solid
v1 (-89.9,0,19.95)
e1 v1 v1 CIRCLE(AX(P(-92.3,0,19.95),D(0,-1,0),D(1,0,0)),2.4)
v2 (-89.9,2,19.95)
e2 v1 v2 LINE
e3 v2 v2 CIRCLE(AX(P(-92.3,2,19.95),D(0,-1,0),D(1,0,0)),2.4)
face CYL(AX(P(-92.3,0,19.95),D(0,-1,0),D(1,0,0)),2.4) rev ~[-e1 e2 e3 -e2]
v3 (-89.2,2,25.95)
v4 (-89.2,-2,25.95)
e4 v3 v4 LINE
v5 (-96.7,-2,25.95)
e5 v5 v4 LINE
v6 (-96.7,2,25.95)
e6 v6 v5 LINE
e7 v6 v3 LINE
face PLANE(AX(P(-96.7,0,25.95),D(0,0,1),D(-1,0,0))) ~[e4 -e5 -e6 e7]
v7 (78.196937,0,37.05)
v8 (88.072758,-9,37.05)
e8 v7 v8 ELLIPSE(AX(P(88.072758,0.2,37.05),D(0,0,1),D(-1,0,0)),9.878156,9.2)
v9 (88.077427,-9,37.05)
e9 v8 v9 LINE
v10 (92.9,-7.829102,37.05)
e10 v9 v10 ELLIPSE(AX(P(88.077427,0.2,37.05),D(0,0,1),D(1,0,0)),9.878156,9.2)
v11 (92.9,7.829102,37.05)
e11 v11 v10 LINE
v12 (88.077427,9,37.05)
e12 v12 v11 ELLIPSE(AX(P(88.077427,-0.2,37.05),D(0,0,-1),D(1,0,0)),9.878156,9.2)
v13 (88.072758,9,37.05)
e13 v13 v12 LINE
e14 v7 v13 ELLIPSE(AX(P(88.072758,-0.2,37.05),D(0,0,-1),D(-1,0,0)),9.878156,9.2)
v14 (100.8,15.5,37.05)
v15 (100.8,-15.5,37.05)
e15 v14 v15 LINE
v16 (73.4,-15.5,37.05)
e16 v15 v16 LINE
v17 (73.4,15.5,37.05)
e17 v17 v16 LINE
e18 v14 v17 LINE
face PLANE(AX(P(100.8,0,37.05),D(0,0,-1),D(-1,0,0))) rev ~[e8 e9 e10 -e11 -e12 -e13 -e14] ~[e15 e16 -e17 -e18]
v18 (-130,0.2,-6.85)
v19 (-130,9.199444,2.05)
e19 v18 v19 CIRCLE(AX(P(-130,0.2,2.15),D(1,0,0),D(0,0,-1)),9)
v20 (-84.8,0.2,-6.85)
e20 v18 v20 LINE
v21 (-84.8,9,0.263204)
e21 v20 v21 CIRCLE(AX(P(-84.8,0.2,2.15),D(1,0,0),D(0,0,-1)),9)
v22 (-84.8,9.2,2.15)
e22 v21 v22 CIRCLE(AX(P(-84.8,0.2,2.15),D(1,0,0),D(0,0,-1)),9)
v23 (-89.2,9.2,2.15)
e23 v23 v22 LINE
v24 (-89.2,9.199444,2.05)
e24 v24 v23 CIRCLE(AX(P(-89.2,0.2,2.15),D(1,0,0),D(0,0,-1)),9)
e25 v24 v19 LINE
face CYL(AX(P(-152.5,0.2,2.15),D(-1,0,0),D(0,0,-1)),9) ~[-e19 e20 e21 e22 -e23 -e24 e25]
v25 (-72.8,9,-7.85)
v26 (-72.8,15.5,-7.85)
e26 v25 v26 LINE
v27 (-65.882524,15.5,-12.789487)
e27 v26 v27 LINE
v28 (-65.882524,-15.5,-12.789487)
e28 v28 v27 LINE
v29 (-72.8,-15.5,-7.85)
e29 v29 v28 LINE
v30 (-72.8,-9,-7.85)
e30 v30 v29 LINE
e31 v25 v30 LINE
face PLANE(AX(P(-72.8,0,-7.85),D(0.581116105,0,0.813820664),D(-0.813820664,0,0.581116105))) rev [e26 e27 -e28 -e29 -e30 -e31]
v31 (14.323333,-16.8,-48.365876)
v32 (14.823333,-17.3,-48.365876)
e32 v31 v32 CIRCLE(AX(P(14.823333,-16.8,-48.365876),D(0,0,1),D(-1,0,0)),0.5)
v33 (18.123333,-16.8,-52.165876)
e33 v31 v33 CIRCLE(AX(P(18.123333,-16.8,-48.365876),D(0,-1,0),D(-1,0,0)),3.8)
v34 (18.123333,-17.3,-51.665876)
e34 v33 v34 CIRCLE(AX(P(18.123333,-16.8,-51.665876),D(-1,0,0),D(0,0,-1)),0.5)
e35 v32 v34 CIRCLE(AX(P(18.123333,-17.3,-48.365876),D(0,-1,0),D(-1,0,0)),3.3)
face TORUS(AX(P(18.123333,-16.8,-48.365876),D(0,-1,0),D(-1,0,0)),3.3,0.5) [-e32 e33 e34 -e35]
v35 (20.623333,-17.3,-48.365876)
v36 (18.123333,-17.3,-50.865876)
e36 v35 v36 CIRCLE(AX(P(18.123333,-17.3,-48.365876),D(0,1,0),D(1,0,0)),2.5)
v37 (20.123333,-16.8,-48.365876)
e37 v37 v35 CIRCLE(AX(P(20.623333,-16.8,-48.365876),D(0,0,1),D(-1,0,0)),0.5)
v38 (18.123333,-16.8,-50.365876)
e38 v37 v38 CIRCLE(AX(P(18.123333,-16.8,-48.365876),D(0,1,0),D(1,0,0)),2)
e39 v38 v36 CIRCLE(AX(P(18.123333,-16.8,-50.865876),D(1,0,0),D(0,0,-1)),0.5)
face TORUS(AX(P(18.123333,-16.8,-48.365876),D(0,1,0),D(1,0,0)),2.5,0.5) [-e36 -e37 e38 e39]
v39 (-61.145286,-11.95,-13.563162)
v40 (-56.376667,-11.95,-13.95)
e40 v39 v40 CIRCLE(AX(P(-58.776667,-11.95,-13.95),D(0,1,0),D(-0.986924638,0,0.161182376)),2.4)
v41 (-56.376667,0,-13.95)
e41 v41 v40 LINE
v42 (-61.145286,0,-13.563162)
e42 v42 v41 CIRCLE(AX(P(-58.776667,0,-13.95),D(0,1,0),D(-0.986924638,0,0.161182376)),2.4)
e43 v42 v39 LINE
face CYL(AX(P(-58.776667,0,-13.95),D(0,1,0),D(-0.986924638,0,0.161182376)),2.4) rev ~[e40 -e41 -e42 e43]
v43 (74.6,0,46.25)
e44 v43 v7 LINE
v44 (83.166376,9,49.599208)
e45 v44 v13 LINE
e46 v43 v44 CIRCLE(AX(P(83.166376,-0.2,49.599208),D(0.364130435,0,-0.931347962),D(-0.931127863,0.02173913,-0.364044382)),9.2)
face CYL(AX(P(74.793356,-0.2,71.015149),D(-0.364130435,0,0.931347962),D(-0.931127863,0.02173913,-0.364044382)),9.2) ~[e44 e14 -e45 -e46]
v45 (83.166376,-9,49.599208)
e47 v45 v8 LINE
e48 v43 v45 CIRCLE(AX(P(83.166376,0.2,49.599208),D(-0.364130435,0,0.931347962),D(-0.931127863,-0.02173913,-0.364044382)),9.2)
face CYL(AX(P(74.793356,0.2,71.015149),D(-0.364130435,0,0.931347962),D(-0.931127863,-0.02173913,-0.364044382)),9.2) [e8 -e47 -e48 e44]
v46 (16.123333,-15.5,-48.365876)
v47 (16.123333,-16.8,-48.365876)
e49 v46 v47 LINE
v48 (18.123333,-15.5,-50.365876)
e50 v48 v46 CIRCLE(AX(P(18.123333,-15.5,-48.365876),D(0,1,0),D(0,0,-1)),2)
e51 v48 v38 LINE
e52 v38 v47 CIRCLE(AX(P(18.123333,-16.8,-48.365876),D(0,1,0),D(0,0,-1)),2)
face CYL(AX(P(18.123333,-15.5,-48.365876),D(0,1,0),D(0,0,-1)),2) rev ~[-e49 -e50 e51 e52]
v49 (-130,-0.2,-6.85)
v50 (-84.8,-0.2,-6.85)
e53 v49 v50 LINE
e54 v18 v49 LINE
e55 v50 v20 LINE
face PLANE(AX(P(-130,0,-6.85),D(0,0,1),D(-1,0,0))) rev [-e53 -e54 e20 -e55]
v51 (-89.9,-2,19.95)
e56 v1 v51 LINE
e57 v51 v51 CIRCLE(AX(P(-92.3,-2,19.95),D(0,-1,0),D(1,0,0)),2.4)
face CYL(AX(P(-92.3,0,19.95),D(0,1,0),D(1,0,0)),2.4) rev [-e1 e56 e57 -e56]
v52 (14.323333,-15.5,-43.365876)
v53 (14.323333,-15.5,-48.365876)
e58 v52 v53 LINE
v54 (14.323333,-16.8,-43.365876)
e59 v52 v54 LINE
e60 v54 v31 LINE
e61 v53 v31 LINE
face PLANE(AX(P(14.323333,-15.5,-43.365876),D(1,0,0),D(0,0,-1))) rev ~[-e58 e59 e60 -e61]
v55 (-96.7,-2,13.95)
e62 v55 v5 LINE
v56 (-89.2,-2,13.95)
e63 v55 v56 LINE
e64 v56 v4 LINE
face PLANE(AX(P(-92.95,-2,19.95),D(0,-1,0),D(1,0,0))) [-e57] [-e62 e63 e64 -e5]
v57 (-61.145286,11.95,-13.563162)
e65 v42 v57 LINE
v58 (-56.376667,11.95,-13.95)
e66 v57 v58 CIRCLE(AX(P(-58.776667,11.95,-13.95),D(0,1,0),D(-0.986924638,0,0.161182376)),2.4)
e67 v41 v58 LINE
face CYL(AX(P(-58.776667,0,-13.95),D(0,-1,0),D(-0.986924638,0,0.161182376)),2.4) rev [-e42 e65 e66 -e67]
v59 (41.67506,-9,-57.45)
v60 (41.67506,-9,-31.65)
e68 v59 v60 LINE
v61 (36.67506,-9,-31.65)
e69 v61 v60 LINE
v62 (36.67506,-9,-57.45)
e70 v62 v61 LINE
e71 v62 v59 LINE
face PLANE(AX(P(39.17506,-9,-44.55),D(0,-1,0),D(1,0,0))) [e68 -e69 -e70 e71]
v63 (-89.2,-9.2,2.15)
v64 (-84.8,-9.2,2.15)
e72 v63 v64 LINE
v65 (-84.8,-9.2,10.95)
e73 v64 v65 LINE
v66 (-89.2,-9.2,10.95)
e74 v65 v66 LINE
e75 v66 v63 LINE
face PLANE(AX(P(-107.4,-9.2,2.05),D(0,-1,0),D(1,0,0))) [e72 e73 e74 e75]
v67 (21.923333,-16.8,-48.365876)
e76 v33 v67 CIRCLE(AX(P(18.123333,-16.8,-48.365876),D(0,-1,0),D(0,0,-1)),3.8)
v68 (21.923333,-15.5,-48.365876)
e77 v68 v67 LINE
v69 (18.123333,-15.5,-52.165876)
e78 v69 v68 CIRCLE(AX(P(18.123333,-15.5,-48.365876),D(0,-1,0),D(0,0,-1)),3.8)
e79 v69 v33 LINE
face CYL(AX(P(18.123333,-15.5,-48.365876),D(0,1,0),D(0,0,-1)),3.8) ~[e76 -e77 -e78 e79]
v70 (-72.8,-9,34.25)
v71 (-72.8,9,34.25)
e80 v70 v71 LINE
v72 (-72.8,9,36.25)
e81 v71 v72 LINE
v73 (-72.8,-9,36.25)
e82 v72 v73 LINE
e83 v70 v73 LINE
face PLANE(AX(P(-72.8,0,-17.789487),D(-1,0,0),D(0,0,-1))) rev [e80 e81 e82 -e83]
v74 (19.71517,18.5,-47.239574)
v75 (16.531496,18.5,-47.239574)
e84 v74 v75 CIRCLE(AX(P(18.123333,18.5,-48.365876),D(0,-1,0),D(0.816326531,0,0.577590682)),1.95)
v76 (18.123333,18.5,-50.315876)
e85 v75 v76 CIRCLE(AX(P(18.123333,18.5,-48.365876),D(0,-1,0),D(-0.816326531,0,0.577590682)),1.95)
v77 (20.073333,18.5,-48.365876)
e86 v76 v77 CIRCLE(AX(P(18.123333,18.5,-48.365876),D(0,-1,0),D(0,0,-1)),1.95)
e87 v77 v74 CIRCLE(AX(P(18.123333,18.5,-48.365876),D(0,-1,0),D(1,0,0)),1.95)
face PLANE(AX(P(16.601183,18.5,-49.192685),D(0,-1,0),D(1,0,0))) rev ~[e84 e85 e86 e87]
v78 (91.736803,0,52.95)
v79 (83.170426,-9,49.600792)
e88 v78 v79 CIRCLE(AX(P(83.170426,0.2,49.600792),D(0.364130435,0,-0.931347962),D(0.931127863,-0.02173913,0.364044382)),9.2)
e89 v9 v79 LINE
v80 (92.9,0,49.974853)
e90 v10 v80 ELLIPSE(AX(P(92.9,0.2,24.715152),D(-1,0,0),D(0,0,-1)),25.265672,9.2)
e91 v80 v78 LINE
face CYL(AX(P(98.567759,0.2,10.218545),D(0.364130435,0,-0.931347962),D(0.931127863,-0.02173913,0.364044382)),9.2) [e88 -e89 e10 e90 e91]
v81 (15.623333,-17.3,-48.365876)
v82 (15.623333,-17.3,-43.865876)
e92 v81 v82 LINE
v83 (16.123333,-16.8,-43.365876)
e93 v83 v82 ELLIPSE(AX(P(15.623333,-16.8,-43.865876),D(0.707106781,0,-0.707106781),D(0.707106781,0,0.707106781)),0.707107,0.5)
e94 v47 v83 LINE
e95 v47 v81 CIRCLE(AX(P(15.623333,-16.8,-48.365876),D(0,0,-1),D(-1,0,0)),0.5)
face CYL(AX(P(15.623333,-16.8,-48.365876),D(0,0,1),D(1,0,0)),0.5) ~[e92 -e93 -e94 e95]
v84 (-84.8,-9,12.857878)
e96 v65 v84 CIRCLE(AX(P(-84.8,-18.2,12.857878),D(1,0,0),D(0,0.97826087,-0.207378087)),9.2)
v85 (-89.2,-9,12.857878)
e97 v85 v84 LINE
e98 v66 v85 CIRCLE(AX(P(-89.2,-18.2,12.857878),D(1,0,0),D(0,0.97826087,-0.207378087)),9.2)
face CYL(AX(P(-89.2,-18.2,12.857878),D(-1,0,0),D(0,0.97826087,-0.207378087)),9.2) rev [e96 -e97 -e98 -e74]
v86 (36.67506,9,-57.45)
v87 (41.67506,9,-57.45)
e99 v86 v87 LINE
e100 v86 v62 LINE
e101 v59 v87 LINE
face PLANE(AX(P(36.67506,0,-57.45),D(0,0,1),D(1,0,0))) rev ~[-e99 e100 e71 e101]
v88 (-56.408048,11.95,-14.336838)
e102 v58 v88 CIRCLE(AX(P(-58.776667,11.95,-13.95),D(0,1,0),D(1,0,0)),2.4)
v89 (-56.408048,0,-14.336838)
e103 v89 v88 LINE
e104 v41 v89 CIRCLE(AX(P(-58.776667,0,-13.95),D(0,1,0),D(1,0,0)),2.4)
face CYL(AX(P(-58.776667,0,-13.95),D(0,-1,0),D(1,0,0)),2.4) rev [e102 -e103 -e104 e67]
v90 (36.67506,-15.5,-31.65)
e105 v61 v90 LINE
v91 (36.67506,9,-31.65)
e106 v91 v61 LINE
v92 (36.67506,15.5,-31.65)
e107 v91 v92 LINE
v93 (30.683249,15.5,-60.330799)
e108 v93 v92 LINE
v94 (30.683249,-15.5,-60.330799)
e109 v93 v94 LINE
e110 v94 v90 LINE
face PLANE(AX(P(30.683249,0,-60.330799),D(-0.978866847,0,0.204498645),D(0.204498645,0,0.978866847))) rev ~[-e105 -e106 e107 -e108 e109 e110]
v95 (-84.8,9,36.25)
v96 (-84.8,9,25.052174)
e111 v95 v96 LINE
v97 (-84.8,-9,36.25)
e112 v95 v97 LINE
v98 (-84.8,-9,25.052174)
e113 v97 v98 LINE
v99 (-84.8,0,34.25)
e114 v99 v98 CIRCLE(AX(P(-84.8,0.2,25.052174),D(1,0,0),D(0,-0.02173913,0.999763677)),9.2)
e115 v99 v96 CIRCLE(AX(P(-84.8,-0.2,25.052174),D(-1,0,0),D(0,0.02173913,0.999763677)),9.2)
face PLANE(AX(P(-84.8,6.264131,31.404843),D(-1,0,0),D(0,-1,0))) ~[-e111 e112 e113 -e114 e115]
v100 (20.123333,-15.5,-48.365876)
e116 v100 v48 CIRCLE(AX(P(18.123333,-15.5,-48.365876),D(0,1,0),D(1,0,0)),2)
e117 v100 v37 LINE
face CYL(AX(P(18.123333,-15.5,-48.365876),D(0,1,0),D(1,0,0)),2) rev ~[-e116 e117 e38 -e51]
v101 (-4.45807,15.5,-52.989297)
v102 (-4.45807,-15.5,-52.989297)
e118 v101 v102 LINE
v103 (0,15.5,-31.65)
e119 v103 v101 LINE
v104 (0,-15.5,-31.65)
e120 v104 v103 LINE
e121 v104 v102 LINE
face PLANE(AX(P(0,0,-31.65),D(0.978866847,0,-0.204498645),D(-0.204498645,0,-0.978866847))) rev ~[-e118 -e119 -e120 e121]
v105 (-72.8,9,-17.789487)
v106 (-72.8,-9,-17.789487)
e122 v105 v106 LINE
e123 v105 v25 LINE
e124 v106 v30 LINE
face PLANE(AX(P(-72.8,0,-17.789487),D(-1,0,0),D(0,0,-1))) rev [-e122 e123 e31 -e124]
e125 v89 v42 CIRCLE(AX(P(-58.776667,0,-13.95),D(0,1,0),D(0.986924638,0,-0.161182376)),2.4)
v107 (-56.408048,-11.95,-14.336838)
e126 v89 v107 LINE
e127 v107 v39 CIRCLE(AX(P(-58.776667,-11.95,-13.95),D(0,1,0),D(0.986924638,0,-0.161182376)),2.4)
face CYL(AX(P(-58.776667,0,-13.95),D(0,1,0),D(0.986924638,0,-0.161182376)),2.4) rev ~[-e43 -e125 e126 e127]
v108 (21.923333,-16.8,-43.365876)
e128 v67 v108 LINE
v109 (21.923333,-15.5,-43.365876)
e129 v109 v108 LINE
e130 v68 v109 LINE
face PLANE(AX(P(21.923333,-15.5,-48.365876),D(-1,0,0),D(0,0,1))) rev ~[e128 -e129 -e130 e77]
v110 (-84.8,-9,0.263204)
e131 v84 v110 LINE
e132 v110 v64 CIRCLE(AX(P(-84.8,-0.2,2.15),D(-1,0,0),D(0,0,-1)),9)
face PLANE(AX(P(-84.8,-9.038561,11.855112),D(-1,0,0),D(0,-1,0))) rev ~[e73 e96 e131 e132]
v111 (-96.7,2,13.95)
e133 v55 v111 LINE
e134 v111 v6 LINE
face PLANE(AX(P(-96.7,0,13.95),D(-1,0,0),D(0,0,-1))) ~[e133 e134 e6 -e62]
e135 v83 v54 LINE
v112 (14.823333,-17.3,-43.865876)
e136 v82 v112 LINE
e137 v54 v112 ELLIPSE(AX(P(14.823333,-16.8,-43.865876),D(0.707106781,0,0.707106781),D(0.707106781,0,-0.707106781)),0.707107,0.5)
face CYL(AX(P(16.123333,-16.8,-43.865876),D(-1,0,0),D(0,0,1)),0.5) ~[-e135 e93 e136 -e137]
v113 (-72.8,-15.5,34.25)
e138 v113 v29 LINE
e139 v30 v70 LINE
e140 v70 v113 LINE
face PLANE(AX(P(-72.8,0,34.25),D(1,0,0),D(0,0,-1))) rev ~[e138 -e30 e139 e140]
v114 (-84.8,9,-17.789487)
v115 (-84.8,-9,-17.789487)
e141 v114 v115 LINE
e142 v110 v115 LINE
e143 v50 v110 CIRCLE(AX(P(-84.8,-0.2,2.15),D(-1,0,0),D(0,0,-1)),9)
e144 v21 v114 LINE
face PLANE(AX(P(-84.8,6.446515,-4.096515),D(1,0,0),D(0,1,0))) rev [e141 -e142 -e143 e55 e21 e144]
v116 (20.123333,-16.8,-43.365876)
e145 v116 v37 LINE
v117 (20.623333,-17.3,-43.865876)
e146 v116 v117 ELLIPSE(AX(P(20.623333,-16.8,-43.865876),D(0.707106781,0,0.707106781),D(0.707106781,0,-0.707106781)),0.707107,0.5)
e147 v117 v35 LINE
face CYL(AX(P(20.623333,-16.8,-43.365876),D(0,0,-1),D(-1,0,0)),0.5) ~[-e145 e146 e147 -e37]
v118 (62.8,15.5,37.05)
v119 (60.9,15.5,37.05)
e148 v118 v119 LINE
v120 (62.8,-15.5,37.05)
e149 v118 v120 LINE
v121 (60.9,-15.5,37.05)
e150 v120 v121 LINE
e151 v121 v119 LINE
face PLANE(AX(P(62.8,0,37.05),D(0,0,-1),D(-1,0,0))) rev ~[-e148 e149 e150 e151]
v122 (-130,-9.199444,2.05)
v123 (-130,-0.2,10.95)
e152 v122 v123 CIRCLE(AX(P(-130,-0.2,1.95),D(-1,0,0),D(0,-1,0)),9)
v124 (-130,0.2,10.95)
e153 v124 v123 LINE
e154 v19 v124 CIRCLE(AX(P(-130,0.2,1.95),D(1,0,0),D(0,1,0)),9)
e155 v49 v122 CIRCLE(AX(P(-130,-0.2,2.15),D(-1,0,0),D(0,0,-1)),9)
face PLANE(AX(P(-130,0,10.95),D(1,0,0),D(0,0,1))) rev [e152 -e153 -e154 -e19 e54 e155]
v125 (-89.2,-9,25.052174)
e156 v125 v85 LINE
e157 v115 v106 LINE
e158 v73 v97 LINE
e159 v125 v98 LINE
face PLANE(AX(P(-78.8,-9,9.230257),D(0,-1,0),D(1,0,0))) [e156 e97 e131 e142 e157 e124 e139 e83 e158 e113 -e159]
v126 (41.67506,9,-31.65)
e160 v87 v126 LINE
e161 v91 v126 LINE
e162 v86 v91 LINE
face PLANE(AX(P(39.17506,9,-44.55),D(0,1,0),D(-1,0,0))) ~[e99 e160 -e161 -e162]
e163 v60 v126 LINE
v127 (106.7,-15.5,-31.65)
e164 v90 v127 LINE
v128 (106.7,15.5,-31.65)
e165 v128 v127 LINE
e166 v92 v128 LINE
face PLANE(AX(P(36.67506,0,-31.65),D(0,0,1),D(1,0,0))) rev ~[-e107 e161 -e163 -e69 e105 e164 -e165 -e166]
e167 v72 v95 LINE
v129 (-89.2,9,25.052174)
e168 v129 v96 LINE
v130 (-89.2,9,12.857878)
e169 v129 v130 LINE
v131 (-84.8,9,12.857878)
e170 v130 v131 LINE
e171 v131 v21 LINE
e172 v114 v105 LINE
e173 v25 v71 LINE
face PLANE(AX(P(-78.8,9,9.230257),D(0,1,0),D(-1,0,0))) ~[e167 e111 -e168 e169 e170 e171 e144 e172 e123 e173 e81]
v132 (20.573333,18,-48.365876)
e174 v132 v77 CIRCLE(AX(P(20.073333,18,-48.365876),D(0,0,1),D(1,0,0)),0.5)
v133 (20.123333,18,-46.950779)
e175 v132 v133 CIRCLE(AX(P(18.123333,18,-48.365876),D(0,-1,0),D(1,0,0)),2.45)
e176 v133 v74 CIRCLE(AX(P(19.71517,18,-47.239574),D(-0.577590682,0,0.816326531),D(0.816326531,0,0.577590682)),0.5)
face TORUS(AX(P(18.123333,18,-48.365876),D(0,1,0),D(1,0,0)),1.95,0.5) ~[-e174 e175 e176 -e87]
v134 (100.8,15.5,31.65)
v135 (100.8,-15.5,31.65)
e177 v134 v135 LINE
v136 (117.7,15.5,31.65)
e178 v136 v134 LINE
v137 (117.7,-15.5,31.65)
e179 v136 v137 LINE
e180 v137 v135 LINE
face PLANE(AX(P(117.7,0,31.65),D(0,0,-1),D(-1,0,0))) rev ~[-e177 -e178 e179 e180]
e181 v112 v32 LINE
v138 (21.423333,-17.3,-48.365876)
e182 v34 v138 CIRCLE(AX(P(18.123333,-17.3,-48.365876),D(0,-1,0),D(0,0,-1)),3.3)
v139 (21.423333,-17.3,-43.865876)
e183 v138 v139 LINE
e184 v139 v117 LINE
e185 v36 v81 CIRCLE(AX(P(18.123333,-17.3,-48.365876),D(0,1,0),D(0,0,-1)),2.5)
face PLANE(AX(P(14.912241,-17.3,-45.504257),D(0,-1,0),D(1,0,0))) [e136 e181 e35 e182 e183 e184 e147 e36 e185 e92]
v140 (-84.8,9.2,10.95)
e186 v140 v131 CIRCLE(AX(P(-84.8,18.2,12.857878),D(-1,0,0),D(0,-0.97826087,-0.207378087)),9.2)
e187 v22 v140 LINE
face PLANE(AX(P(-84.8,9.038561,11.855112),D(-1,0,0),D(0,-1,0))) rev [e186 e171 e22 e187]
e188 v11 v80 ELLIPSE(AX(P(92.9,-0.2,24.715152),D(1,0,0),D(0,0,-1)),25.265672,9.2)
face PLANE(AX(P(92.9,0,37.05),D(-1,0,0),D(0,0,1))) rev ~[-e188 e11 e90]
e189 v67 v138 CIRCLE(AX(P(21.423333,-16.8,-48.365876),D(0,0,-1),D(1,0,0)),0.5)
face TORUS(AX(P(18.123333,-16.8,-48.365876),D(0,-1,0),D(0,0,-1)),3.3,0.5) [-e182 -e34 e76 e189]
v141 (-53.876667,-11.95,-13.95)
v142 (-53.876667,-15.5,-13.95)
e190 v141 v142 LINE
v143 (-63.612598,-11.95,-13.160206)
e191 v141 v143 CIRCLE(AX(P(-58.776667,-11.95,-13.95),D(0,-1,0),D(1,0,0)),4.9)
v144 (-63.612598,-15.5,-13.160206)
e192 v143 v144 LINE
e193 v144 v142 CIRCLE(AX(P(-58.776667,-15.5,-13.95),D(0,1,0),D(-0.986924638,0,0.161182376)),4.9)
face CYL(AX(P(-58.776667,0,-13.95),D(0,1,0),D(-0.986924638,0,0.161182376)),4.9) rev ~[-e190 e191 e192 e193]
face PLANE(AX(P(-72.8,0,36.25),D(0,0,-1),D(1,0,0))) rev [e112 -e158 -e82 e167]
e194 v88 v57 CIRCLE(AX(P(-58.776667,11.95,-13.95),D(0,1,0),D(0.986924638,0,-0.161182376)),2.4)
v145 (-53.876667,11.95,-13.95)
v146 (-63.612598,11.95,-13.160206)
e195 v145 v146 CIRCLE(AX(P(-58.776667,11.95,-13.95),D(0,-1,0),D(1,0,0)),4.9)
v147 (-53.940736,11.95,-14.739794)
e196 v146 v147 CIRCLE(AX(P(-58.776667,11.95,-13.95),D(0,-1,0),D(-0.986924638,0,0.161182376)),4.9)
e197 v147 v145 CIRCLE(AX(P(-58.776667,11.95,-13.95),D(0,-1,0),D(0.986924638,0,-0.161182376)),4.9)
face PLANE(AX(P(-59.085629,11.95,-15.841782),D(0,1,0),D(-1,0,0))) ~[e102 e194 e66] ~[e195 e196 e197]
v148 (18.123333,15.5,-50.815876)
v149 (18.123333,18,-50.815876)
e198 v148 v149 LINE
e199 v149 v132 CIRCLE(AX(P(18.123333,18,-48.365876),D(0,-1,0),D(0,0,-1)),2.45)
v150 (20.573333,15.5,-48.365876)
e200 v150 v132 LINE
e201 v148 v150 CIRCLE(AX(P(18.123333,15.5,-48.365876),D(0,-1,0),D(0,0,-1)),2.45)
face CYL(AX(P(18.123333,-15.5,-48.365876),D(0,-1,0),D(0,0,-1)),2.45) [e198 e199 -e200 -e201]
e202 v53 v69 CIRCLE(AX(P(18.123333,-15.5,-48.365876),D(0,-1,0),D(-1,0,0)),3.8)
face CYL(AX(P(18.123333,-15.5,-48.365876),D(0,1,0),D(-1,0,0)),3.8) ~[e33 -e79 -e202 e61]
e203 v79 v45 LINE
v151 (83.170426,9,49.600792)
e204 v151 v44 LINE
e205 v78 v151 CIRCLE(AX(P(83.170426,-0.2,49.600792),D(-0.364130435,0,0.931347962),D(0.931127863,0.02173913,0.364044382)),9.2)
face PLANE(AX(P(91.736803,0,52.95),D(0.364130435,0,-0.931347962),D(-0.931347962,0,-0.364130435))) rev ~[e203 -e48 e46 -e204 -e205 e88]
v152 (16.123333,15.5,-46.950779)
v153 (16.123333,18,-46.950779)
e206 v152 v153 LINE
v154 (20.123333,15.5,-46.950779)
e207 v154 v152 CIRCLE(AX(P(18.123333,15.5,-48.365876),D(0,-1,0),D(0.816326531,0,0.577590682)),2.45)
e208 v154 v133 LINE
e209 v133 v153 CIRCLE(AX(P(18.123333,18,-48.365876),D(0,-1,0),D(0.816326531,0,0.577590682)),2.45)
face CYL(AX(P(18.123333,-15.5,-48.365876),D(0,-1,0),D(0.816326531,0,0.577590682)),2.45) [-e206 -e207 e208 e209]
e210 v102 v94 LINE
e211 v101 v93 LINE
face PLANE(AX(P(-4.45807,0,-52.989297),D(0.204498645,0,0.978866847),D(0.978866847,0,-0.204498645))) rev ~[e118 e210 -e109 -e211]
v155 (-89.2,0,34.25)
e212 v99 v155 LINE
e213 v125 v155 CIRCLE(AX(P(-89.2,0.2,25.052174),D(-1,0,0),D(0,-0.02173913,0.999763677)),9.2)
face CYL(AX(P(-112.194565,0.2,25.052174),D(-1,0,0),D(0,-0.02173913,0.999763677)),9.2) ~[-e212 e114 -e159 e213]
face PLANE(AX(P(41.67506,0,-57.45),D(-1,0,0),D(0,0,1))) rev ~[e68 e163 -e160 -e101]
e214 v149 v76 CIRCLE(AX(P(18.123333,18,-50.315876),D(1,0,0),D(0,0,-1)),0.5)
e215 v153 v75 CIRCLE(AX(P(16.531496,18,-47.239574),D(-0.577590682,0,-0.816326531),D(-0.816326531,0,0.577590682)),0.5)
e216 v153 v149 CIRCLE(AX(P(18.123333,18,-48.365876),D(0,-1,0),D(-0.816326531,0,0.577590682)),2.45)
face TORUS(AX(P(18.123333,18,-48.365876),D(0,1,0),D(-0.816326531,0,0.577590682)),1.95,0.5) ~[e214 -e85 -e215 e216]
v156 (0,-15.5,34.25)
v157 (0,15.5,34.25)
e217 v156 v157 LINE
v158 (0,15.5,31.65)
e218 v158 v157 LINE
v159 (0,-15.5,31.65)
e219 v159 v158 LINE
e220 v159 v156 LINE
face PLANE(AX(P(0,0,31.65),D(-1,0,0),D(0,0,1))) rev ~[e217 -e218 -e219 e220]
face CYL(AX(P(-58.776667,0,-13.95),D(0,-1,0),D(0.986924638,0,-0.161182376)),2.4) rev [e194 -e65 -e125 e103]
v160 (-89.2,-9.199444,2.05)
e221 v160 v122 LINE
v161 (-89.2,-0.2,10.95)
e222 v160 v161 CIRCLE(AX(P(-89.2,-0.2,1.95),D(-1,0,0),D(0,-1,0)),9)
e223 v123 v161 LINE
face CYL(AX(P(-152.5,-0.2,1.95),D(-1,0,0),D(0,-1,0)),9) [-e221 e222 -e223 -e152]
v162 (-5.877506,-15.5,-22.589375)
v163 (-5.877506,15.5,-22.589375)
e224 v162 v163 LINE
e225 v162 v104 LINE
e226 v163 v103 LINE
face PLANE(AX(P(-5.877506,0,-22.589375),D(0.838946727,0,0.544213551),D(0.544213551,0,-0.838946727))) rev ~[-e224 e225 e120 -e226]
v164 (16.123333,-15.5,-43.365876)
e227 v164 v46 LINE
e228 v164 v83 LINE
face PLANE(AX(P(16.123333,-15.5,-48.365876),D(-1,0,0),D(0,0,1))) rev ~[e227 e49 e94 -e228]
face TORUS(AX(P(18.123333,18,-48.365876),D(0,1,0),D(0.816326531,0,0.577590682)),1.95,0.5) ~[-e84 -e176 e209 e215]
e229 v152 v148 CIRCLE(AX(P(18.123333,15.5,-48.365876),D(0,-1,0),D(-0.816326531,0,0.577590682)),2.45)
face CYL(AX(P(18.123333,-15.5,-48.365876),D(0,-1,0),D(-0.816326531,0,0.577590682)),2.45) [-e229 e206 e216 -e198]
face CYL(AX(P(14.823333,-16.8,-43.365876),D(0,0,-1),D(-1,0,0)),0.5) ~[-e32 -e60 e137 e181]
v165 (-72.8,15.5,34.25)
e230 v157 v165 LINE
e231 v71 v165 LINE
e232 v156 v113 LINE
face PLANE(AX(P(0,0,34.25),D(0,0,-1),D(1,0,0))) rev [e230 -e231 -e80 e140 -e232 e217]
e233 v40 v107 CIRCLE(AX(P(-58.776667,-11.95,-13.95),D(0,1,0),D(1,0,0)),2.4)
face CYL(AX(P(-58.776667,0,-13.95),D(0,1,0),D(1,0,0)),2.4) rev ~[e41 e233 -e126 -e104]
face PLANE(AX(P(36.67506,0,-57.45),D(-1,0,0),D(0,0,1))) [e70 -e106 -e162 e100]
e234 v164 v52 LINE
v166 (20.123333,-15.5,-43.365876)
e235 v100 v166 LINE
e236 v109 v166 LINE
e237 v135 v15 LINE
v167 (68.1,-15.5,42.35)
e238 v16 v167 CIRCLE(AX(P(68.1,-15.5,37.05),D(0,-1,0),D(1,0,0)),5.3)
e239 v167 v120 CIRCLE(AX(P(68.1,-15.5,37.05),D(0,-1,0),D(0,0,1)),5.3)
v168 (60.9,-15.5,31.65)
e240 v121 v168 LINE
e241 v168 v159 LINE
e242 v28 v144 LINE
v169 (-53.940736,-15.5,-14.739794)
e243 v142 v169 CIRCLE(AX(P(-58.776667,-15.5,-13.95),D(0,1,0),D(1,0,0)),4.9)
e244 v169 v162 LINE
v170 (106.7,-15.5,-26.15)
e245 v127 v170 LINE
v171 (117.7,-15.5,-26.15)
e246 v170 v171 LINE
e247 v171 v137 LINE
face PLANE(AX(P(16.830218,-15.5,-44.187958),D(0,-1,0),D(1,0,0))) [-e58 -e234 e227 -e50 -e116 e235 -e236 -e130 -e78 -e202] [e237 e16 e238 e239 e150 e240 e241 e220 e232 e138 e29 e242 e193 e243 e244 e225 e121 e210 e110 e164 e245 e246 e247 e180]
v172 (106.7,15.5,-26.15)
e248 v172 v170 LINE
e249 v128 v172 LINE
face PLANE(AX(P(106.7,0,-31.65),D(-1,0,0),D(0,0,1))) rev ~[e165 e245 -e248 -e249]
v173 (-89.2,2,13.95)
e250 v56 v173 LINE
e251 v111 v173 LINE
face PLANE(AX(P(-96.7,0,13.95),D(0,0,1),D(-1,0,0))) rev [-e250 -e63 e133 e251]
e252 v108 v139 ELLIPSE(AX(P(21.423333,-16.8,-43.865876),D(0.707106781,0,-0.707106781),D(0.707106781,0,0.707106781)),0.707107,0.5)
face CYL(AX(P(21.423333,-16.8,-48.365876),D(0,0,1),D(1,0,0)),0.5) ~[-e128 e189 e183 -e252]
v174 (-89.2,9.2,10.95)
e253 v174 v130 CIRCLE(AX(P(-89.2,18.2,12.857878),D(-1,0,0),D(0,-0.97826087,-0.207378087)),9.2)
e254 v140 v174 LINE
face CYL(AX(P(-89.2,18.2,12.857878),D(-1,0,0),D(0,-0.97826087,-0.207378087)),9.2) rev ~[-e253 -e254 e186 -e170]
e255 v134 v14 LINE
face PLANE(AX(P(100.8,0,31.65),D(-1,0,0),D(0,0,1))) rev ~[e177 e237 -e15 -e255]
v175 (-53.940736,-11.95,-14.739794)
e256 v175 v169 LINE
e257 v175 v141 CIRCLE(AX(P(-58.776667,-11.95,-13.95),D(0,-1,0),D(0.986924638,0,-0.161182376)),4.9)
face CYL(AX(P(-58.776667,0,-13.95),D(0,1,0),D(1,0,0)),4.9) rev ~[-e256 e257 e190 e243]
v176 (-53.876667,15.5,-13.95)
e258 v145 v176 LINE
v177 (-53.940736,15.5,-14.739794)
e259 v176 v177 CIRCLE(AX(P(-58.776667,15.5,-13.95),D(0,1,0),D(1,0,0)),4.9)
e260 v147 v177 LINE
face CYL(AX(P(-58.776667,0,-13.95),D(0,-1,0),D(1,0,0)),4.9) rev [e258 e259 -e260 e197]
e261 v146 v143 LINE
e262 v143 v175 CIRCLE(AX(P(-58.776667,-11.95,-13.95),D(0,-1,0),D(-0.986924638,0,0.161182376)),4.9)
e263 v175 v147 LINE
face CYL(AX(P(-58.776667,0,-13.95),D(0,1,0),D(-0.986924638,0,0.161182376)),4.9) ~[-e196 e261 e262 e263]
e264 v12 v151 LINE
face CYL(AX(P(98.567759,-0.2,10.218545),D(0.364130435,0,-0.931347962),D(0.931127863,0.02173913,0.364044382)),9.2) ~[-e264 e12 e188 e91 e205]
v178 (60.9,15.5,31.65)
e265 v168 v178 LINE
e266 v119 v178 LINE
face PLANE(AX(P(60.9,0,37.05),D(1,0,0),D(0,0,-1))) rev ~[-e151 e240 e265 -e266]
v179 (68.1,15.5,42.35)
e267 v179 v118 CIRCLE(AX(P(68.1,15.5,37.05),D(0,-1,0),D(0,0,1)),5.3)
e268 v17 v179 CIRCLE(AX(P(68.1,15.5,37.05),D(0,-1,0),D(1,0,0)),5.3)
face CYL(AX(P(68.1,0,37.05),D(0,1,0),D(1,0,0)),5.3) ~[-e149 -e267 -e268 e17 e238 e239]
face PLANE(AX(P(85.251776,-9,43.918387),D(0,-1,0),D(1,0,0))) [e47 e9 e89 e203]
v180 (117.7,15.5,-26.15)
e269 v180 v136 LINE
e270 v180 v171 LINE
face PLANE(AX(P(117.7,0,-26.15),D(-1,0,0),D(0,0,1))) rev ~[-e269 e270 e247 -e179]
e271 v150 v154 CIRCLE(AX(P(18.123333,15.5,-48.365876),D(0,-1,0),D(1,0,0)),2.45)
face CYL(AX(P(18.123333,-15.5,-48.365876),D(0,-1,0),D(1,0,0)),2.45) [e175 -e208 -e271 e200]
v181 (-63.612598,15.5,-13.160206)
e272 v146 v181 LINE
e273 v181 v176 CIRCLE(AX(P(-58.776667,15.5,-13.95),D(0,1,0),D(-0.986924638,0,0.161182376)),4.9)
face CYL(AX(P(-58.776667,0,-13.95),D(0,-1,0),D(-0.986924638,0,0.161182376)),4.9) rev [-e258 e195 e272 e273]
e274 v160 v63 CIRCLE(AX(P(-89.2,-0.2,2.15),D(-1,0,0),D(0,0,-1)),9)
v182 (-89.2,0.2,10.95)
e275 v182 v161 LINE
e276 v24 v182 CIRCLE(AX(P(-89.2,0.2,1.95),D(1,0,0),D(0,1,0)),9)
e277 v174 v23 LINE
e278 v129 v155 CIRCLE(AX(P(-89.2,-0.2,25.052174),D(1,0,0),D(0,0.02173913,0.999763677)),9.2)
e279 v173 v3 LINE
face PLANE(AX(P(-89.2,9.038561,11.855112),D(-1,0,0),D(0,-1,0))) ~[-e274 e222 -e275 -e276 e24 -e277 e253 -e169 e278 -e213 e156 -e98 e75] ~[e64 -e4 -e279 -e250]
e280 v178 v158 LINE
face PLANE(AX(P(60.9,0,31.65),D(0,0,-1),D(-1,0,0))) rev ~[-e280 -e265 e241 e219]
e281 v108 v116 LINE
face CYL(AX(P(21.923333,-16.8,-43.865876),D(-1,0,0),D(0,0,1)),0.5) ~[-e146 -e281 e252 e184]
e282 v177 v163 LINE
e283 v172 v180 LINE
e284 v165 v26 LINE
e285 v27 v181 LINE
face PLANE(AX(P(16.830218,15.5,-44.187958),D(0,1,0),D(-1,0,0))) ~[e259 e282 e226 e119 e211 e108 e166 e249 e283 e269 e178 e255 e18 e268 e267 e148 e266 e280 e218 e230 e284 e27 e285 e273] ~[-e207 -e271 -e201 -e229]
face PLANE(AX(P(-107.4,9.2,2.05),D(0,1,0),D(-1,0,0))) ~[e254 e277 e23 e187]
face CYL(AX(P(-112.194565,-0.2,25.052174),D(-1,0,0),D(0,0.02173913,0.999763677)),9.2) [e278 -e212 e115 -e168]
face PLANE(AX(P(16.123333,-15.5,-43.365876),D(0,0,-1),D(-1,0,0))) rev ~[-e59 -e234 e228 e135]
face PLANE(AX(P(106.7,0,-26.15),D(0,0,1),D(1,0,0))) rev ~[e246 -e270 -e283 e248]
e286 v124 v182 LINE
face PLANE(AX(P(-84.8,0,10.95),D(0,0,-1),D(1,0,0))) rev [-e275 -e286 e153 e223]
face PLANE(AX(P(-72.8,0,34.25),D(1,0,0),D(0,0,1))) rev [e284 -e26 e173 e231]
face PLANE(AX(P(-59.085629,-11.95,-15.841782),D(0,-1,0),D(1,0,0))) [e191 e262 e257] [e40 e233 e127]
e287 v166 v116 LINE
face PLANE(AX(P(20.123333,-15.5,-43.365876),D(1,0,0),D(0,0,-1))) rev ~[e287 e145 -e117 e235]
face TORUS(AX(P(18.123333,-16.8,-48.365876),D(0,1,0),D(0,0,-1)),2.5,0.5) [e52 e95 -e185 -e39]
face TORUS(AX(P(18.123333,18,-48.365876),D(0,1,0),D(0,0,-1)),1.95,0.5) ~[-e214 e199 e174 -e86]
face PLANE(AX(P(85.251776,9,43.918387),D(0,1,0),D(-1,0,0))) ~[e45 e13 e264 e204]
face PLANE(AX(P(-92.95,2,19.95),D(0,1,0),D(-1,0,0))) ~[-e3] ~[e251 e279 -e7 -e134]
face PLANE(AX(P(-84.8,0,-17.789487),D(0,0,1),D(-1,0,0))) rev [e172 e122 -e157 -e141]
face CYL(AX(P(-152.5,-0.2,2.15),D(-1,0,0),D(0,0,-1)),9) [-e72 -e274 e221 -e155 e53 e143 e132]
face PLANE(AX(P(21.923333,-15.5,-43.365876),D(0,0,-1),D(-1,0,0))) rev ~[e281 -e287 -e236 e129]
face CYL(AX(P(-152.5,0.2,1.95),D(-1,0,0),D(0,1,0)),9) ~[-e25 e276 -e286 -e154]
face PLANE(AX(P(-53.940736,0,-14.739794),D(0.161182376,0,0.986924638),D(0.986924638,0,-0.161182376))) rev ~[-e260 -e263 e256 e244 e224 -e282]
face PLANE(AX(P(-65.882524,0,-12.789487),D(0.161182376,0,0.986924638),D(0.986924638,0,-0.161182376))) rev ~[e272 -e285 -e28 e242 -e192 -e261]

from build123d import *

# Parameters (mm, degrees)
F0_W        = 11
F0_H        = 57.8
F1_DEPTH    = 15.5
F2_DEPTH    = 9.2
F3_DEPTH    = 9
F0_W_2      = 7.5
F0_H_2      = 12
F0_R        = 2.4
F4_DEPTH    = 2
F0_W_3      = 5
F0_H_3      = 25.8
F5_DEPTH    = 9
F6_DEPTH    = 11.95
F7_T4_DEPTH = 55.8672846567
F7_T9_DEPTH = 65.2797771826
F8_T1_DEPTH = 4.4
F8_T3_DEPTH = 27.3945645751
F9_T1_DEPTH = 67.7
F9_T3_DEPTH = 63.3
F12_DEPTH   = 1.8
F13_DEPTH   = 34
F14_R       = 0.5
F15_R       = 0.5


# Not quite as in the source:
# - a fillet or chamfer that OpenCascade refuses, or shapes differently, is made with other operations: its cross-section is extruded or revolved along the edge and cut away or added


with BuildPart() as f1:
    # F0 (on Front) → F1 (new body)
    with BuildSketch(Plane.XZ):
        Polygon((36.6750596455, -31.65), (0, -31.65), (-4.4580704593, -52.9892972654), (30.6832493492, -60.3307986181), align=None)
        with BuildLine():
            Line((0, -31.65), (0, 31.65))
            Line((0, 31.65), (0, 34.25))
            Line((0, 34.25), (-72.8, 34.25))
            Line((-72.8, 34.25), (-72.8, -7.85))
            Line((-72.8, -7.85), (-65.8825243602, -12.7894868936))
            Line((-65.8825243602, -12.7894868936), (-63.6125976921, -13.1602063582))
            ThreePointArc((-63.6125976921, -13.1602063582), (-58.3804729246, -9.066043583), (-53.8766669643, -13.95))
            ThreePointArc((-53.8766669643, -13.95), (-53.8927105474, -14.3461940397), (-53.9407362366, -14.7397936418))
            Line((-53.9407362366, -14.7397936418), (-5.8775063509, -22.5893753474))
            Line((-5.8775063509, -22.5893753474), (0, -31.65))
        make_face()
        Polygon((60.9, 31.65), (0, 31.65), (0, -31.65), (36.6750596455, -31.65), (41.6750596455, -31.65), (106.7, -31.65), (106.7, -26.15), (106.7, 31.65), (100.8, 31.65), align=None)
        with Locations((112.2, 2.75)):
            Rectangle(F0_W, F0_H)
        with BuildLine():
            Line((60.9, 37.05), (60.9, 31.65))
            Line((60.9, 31.65), (100.8, 31.65))
            Line((100.8, 31.65), (100.8, 37.05))
            Line((100.8, 37.05), (92.9, 37.05))
            Line((92.9, 37.05), (78.1969370594, 37.05))
            Line((78.1969370594, 37.05), (73.4, 37.05))
            ThreePointArc((73.4, 37.05), (68.1, 31.75), (62.8, 37.05))
            Line((62.8, 37.05), (60.9, 37.05))
        make_face()
        with BuildLine():
            Line((68.1, 42.35), (68.1, 37.05))
            Line((68.1, 37.05), (73.4, 37.05))
            ThreePointArc((73.4, 37.05), (71.8476659403, 40.7976659403), (68.1, 42.35))
        make_face()
        with BuildLine():
            ThreePointArc((68.1, 42.35), (64.3523340597, 40.7976659403), (62.8, 37.05))
            Line((62.8, 37.05), (68.1, 37.05))
            Line((68.1, 37.05), (68.1, 42.35))
        make_face()
        with BuildLine():
            Line((68.1, 37.05), (62.8, 37.05))
            ThreePointArc((62.8, 37.05), (68.1, 31.75), (73.4, 37.05))
            Line((73.4, 37.05), (68.1, 37.05))
        make_face()
    extrude(amount=F1_DEPTH)



with BuildPart() as f2:
    # F0 (on Front) → F2 (new body)
    with BuildSketch(Plane.XZ):
        Polygon((-130, -6.85), (-84.8, -6.85), (-84.8, 10.95), (-89.2, 10.95), (-130, 10.95), align=None)
    extrude(amount=F2_DEPTH)


with BuildPart() as f1_1:
    add(f1.part)

    add(f2.part)  # F3 merges F2
    # F0 (on Front) → F3 (join)
    with BuildSketch(Plane.XZ):
        Polygon((-72.8, -7.85), (-72.8, 34.25), (-72.8, 36.25), (-84.8, 36.25), (-84.8, 34.25), (-84.8, 10.95), (-84.8, -6.85), (-84.8, -17.7894868936), (-72.8, -17.7894868936), align=None)
        Polygon((-84.8, 10.95), (-84.8, 34.25), (-89.2, 34.25), (-89.2, 25.95), (-89.2, 13.95), (-89.2, 10.95), align=None)
        Polygon((78.1969370594, 37.05), (92.9, 37.05), (92.9, 49.9748528671), (91.7368025022, 52.95), (74.6, 46.25), align=None)
    extrude(amount=F3_DEPTH)

    # F0 (on Front) → F4 (join)
    with BuildSketch(Plane.XZ):
        with Locations((-92.95, 19.95)):
            Rectangle(F0_W_2, F0_H_2)
        with Locations((-92.3, 19.95)):
            Circle(F0_R, mode=Mode.SUBTRACT)
    extrude(amount=F4_DEPTH)

    # F0 (on Front) → F5 (join)
    with BuildSketch(Plane.XZ):
        with Locations((39.1750596455, -44.55)):
            Rectangle(F0_W_3, F0_H_3)
    extrude(amount=F5_DEPTH)

    # F0 (on Front) → F6 (join)
    with BuildSketch(Plane.XZ):
        with BuildLine():
            ThreePointArc((-63.6125976921, -13.1602063582), (-59.5664606062, -18.7859307277), (-53.9407362366, -14.7397936418))
            Line((-53.9407362366, -14.7397936418), (-56.4080478324, -14.3368377021))
            ThreePointArc((-56.4080478324, -14.3368377021), (-59.1635046665, -16.3186191319), (-61.1452860963, -13.5631622979))
            Line((-61.1452860963, -13.5631622979), (-63.6125976921, -13.1602063582))
        make_face()
        with BuildLine():
            Line((-56.4080478324, -14.3368377021), (-53.9407362366, -14.7397936418))
            ThreePointArc((-53.9407362366, -14.7397936418), (-53.8927105474, -14.3461940397), (-53.8766669643, -13.95))
            ThreePointArc((-53.8766669643, -13.95), (-58.3804729246, -9.066043583), (-63.6125976921, -13.1602063582))
            Line((-63.6125976921, -13.1602063582), (-61.1452860963, -13.5631622979))
            ThreePointArc((-61.1452860963, -13.5631622979), (-58.5826127408, -11.5578580815), (-56.3766669643, -13.95))
            ThreePointArc((-56.3766669643, -13.95), (-56.3845250458, -14.1440542235), (-56.4080478324, -14.3368377021))
        make_face()
    extrude(amount=F6_DEPTH)

    # F7: fillet of radius 9.2 on 2 edges, made by hand


with BuildPart() as f7_tool2:
    # F7_s3 → F7_t4 (new body)
    with BuildSketch(Plane(origin=(-14.1665955701, 0, 36.2343508079), x_dir=(0, 1, 0), z_dir=(0.3641304348, 0, -0.9313479621))):
        with BuildLine():
            ThreePointArc((0, 86.3195905796), (-6.3757128891, 89.0831332328), (-9, 95.5174164097))
            Line((-9, 95.5174164097), (-9, 86.3195905796))
            Line((-9, 86.3195905796), (0, 86.3195905796))
        make_face()
    extrude(amount=F7_T4_DEPTH)

    split(bisect_by=Plane.XY.offset(37.05), keep=Keep.TOP)


with BuildPart() as f1_2:
    add(f1_1.part)

    # F7_t1: cut F7_tool2
    add(f7_tool2.part, mode=Mode.SUBTRACT)


with BuildPart() as f7_tool7:
    # F7_s8 → F7_t9 (new body)
    with BuildSketch(Plane(origin=(9.603758078, 0, -24.563836636), x_dir=(0, 1, 0), z_dir=(-0.3641304348, 0, 0.9313479621))):
        with BuildLine():
            ThreePointArc((0, -104.7195905796), (-6.3757128891, -101.9560479264), (-9, -95.5217647496))
            Line((-9, -95.5217647496), (-9, -104.7195905796))
            Line((-9, -104.7195905796), (0, -104.7195905796))
        make_face()
    extrude(amount=F7_T9_DEPTH)

    split(bisect_by=Plane.XY.offset(37.05), keep=Keep.TOP)


with BuildPart() as f1_3:
    add(f1_2.part)

    # F7_t6: cut F7_tool7
    add(f7_tool7.part, mode=Mode.SUBTRACT)

    # F8: fillet of radius 9.2 on 2 edges, made by hand

    # F8_s2 → F8_t1 (join)
    with BuildSketch(Plane.YZ.offset(-89.2)):
        with BuildLine():
            ThreePointArc((-9.2, 10.95), (-9.050136613, 11.8987120982), (-9, 12.8578784028))
            Line((-9, 12.8578784028), (-9, 10.95))
            Line((-9, 10.95), (-9.2, 10.95))
        make_face()
    extrude(amount=F8_T1_DEPTH)

    # F8_s4 → F8_t3 (cut)
    with BuildSketch(Plane.YZ.offset(-112.1945645751)):
        with BuildLine():
            ThreePointArc((0, 34.25), (-6.3757128891, 31.4864573468), (-9, 25.0521741699))
            Line((-9, 25.0521741699), (-9, 34.25))
            Line((-9, 34.25), (0, 34.25))
        make_face()
    extrude(amount=F8_T3_DEPTH, mode=Mode.SUBTRACT)

    # F9: fillet of radius 9 on 2 edges, made by hand

    # F9_s2 → F9_t1 (cut)
    with BuildSketch(Plane.YZ.offset(-152.5)):
        with BuildLine():
            ThreePointArc((-0.2, -6.85), (-6.5639610307, -4.2139610307), (-9.2, 2.15))
            Line((-9.2, 2.15), (-9.2, -6.85))
            Line((-9.2, -6.85), (-0.2, -6.85))
        make_face()
    extrude(amount=F9_T1_DEPTH, mode=Mode.SUBTRACT)

    # F9_s4 → F9_t3 (cut)
    with BuildSketch(Plane.YZ.offset(-152.5)):
        with BuildLine():
            ThreePointArc((-9.2, 1.95), (-6.5639610307, 8.3139610307), (-0.2, 10.95))
            Line((-0.2, 10.95), (-9.2, 10.95))
            Line((-9.2, 10.95), (-9.2, 1.95))
        make_face()
    extrude(amount=F9_T3_DEPTH, mode=Mode.SUBTRACT)

    # F10: F1 across plane


with BuildPart() as f1_4:
    add(f1_3.part)
    add(f1_3.part.mirror(Plane.XZ))

    # F11 (on face) → F12 (join)
    with BuildSketch(Plane.XZ.offset(15.5)):
        with BuildLine():
            ThreePointArc((14.3233330357, -48.3658756971), (14.8036945011, -46.5165514962), (16.1233330357, -45.1347768128))
            Line((16.1233330357, -45.1347768128), (16.1233330357, -43.3658756971))
            Line((16.1233330357, -43.3658756971), (14.3233330357, -43.3658756971))
            Line((14.3233330357, -43.3658756971), (14.3233330357, -48.3658756971))
        make_face()
        with BuildLine():
            Line((18.1233330357, -52.1658756971), (18.1233330357, -50.8158756971))
            ThreePointArc((18.1233330357, -50.8158756971), (15.9473863376, -49.4918223952), (16.1233330357, -46.9507785273))
            Line((16.1233330357, -46.9507785273), (16.1233330357, -45.1347768128))
            ThreePointArc((16.1233330357, -45.1347768128), (14.8036945011, -46.5165514962), (14.3233330357, -48.3658756971))
            ThreePointArc((14.3233330357, -48.3658756971), (15.4363272672, -51.0528814656), (18.1233330357, -52.1658756971))
        make_face()
        with BuildLine():
            ThreePointArc((16.1233330357, -46.9507785273), (15.9473863376, -49.4918223952), (18.1233330357, -50.8158756971))
            Line((18.1233330357, -50.8158756971), (18.1233330357, -50.3658756971))
            ThreePointArc((18.1233330357, -50.3658756971), (16.7091194733, -49.7800892595), (16.1233330357, -48.3658756971))
            Line((16.1233330357, -48.3658756971), (16.1233330357, -46.9507785273))
        make_face()
        with BuildLine():
            ThreePointArc((18.1233330357, -50.8158756971), (19.8557446496, -50.098287311), (20.5733330357, -48.3658756971))
            ThreePointArc((20.5733330357, -48.3658756971), (20.4581242469, -47.6234135769), (20.1233330357, -46.9507785273))
            Line((20.1233330357, -46.9507785273), (20.1233330357, -48.3658756971))
            ThreePointArc((20.1233330357, -48.3658756971), (19.537546598, -49.7800892595), (18.1233330357, -50.3658756971))
            Line((18.1233330357, -50.3658756971), (18.1233330357, -50.8158756971))
        make_face()
        with BuildLine():
            ThreePointArc((20.1233330357, -46.9507785273), (20.4581242469, -47.6234135769), (20.5733330357, -48.3658756971))
            ThreePointArc((20.5733330357, -48.3658756971), (19.8557446496, -50.098287311), (18.1233330357, -50.8158756971))
            Line((18.1233330357, -50.8158756971), (18.1233330357, -52.1658756971))
            ThreePointArc((18.1233330357, -52.1658756971), (20.8103388042, -51.0528814656), (21.9233330357, -48.3658756971))
            ThreePointArc((21.9233330357, -48.3658756971), (21.4429715702, -46.5165514962), (20.1233330357, -45.1347768128))
            Line((20.1233330357, -45.1347768128), (20.1233330357, -46.9507785273))
        make_face()
        with BuildLine():
            Line((20.1233330357, -43.3658756971), (20.1233330357, -45.1347768128))
            ThreePointArc((20.1233330357, -45.1347768128), (21.4429715702, -46.5165514962), (21.9233330357, -48.3658756971))
            Line((21.9233330357, -48.3658756971), (21.9233330357, -43.3658756971))
            Line((21.9233330357, -43.3658756971), (20.1233330357, -43.3658756971))
        make_face()
    extrude(amount=F12_DEPTH)

    # F11 (on face) → F13 (join)
    with BuildSketch(Plane.XZ.offset(15.5)):
        with BuildLine():
            ThreePointArc((16.1233330357, -46.9507785273), (15.9473863376, -49.4918223952), (18.1233330357, -50.8158756971))
            Line((18.1233330357, -50.8158756971), (18.1233330357, -50.3658756971))
            ThreePointArc((18.1233330357, -50.3658756971), (16.7091194733, -49.7800892595), (16.1233330357, -48.3658756971))
            Line((16.1233330357, -48.3658756971), (16.1233330357, -46.9507785273))
        make_face()
        with BuildLine():
            Line((20.1233330357, -48.3658756971), (20.1233330357, -46.9507785273))
            ThreePointArc((20.1233330357, -46.9507785273), (18.1233330357, -45.9158756971), (16.1233330357, -46.9507785273))
            Line((16.1233330357, -46.9507785273), (16.1233330357, -48.3658756971))
            ThreePointArc((16.1233330357, -48.3658756971), (18.1233330357, -46.3658756971), (20.1233330357, -48.3658756971))
        make_face()
        with BuildLine():
            ThreePointArc((18.1233330357, -50.8158756971), (19.8557446496, -50.098287311), (20.5733330357, -48.3658756971))
            ThreePointArc((20.5733330357, -48.3658756971), (20.4581242469, -47.6234135769), (20.1233330357, -46.9507785273))
            Line((20.1233330357, -46.9507785273), (20.1233330357, -48.3658756971))
            ThreePointArc((20.1233330357, -48.3658756971), (19.537546598, -49.7800892595), (18.1233330357, -50.3658756971))
            Line((18.1233330357, -50.3658756971), (18.1233330357, -50.8158756971))
        make_face()
        with BuildLine():
            ThreePointArc((18.1233330357, -50.3658756971), (19.537546598, -49.7800892595), (20.1233330357, -48.3658756971))
            ThreePointArc((20.1233330357, -48.3658756971), (18.1233330357, -46.3658756971), (16.1233330357, -48.3658756971))
            ThreePointArc((16.1233330357, -48.3658756971), (16.7091194733, -49.7800892595), (18.1233330357, -50.3658756971))
        make_face()
    extrude(amount=-F13_DEPTH)

    # F14
    f14_edges = [f1_4.edges().sort_by_distance(p)[0] for p in [
        (18.123333, 18.5, -45.915876),
    ]]
    fillet(f14_edges, radius=F14_R)

    # F15
    f15_edges = [f1_4.edges().sort_by_distance(p)[0] for p in [
        (14.323333, -17.3, -45.865876),
        (18.123333, -17.3, -52.165876),
        (16.123333, -17.3, -45.865876),
        (21.023333, -17.3, -43.365876),
        (15.223333, -17.3, -43.365876),
        (21.923333, -17.3, -45.865876),
        (20.123333, -17.3, -45.865876),
        (18.123333, -17.3, -50.365876),
    ]]
    fillet(f15_edges, radius=F15_R)


solid = f1_4.part
